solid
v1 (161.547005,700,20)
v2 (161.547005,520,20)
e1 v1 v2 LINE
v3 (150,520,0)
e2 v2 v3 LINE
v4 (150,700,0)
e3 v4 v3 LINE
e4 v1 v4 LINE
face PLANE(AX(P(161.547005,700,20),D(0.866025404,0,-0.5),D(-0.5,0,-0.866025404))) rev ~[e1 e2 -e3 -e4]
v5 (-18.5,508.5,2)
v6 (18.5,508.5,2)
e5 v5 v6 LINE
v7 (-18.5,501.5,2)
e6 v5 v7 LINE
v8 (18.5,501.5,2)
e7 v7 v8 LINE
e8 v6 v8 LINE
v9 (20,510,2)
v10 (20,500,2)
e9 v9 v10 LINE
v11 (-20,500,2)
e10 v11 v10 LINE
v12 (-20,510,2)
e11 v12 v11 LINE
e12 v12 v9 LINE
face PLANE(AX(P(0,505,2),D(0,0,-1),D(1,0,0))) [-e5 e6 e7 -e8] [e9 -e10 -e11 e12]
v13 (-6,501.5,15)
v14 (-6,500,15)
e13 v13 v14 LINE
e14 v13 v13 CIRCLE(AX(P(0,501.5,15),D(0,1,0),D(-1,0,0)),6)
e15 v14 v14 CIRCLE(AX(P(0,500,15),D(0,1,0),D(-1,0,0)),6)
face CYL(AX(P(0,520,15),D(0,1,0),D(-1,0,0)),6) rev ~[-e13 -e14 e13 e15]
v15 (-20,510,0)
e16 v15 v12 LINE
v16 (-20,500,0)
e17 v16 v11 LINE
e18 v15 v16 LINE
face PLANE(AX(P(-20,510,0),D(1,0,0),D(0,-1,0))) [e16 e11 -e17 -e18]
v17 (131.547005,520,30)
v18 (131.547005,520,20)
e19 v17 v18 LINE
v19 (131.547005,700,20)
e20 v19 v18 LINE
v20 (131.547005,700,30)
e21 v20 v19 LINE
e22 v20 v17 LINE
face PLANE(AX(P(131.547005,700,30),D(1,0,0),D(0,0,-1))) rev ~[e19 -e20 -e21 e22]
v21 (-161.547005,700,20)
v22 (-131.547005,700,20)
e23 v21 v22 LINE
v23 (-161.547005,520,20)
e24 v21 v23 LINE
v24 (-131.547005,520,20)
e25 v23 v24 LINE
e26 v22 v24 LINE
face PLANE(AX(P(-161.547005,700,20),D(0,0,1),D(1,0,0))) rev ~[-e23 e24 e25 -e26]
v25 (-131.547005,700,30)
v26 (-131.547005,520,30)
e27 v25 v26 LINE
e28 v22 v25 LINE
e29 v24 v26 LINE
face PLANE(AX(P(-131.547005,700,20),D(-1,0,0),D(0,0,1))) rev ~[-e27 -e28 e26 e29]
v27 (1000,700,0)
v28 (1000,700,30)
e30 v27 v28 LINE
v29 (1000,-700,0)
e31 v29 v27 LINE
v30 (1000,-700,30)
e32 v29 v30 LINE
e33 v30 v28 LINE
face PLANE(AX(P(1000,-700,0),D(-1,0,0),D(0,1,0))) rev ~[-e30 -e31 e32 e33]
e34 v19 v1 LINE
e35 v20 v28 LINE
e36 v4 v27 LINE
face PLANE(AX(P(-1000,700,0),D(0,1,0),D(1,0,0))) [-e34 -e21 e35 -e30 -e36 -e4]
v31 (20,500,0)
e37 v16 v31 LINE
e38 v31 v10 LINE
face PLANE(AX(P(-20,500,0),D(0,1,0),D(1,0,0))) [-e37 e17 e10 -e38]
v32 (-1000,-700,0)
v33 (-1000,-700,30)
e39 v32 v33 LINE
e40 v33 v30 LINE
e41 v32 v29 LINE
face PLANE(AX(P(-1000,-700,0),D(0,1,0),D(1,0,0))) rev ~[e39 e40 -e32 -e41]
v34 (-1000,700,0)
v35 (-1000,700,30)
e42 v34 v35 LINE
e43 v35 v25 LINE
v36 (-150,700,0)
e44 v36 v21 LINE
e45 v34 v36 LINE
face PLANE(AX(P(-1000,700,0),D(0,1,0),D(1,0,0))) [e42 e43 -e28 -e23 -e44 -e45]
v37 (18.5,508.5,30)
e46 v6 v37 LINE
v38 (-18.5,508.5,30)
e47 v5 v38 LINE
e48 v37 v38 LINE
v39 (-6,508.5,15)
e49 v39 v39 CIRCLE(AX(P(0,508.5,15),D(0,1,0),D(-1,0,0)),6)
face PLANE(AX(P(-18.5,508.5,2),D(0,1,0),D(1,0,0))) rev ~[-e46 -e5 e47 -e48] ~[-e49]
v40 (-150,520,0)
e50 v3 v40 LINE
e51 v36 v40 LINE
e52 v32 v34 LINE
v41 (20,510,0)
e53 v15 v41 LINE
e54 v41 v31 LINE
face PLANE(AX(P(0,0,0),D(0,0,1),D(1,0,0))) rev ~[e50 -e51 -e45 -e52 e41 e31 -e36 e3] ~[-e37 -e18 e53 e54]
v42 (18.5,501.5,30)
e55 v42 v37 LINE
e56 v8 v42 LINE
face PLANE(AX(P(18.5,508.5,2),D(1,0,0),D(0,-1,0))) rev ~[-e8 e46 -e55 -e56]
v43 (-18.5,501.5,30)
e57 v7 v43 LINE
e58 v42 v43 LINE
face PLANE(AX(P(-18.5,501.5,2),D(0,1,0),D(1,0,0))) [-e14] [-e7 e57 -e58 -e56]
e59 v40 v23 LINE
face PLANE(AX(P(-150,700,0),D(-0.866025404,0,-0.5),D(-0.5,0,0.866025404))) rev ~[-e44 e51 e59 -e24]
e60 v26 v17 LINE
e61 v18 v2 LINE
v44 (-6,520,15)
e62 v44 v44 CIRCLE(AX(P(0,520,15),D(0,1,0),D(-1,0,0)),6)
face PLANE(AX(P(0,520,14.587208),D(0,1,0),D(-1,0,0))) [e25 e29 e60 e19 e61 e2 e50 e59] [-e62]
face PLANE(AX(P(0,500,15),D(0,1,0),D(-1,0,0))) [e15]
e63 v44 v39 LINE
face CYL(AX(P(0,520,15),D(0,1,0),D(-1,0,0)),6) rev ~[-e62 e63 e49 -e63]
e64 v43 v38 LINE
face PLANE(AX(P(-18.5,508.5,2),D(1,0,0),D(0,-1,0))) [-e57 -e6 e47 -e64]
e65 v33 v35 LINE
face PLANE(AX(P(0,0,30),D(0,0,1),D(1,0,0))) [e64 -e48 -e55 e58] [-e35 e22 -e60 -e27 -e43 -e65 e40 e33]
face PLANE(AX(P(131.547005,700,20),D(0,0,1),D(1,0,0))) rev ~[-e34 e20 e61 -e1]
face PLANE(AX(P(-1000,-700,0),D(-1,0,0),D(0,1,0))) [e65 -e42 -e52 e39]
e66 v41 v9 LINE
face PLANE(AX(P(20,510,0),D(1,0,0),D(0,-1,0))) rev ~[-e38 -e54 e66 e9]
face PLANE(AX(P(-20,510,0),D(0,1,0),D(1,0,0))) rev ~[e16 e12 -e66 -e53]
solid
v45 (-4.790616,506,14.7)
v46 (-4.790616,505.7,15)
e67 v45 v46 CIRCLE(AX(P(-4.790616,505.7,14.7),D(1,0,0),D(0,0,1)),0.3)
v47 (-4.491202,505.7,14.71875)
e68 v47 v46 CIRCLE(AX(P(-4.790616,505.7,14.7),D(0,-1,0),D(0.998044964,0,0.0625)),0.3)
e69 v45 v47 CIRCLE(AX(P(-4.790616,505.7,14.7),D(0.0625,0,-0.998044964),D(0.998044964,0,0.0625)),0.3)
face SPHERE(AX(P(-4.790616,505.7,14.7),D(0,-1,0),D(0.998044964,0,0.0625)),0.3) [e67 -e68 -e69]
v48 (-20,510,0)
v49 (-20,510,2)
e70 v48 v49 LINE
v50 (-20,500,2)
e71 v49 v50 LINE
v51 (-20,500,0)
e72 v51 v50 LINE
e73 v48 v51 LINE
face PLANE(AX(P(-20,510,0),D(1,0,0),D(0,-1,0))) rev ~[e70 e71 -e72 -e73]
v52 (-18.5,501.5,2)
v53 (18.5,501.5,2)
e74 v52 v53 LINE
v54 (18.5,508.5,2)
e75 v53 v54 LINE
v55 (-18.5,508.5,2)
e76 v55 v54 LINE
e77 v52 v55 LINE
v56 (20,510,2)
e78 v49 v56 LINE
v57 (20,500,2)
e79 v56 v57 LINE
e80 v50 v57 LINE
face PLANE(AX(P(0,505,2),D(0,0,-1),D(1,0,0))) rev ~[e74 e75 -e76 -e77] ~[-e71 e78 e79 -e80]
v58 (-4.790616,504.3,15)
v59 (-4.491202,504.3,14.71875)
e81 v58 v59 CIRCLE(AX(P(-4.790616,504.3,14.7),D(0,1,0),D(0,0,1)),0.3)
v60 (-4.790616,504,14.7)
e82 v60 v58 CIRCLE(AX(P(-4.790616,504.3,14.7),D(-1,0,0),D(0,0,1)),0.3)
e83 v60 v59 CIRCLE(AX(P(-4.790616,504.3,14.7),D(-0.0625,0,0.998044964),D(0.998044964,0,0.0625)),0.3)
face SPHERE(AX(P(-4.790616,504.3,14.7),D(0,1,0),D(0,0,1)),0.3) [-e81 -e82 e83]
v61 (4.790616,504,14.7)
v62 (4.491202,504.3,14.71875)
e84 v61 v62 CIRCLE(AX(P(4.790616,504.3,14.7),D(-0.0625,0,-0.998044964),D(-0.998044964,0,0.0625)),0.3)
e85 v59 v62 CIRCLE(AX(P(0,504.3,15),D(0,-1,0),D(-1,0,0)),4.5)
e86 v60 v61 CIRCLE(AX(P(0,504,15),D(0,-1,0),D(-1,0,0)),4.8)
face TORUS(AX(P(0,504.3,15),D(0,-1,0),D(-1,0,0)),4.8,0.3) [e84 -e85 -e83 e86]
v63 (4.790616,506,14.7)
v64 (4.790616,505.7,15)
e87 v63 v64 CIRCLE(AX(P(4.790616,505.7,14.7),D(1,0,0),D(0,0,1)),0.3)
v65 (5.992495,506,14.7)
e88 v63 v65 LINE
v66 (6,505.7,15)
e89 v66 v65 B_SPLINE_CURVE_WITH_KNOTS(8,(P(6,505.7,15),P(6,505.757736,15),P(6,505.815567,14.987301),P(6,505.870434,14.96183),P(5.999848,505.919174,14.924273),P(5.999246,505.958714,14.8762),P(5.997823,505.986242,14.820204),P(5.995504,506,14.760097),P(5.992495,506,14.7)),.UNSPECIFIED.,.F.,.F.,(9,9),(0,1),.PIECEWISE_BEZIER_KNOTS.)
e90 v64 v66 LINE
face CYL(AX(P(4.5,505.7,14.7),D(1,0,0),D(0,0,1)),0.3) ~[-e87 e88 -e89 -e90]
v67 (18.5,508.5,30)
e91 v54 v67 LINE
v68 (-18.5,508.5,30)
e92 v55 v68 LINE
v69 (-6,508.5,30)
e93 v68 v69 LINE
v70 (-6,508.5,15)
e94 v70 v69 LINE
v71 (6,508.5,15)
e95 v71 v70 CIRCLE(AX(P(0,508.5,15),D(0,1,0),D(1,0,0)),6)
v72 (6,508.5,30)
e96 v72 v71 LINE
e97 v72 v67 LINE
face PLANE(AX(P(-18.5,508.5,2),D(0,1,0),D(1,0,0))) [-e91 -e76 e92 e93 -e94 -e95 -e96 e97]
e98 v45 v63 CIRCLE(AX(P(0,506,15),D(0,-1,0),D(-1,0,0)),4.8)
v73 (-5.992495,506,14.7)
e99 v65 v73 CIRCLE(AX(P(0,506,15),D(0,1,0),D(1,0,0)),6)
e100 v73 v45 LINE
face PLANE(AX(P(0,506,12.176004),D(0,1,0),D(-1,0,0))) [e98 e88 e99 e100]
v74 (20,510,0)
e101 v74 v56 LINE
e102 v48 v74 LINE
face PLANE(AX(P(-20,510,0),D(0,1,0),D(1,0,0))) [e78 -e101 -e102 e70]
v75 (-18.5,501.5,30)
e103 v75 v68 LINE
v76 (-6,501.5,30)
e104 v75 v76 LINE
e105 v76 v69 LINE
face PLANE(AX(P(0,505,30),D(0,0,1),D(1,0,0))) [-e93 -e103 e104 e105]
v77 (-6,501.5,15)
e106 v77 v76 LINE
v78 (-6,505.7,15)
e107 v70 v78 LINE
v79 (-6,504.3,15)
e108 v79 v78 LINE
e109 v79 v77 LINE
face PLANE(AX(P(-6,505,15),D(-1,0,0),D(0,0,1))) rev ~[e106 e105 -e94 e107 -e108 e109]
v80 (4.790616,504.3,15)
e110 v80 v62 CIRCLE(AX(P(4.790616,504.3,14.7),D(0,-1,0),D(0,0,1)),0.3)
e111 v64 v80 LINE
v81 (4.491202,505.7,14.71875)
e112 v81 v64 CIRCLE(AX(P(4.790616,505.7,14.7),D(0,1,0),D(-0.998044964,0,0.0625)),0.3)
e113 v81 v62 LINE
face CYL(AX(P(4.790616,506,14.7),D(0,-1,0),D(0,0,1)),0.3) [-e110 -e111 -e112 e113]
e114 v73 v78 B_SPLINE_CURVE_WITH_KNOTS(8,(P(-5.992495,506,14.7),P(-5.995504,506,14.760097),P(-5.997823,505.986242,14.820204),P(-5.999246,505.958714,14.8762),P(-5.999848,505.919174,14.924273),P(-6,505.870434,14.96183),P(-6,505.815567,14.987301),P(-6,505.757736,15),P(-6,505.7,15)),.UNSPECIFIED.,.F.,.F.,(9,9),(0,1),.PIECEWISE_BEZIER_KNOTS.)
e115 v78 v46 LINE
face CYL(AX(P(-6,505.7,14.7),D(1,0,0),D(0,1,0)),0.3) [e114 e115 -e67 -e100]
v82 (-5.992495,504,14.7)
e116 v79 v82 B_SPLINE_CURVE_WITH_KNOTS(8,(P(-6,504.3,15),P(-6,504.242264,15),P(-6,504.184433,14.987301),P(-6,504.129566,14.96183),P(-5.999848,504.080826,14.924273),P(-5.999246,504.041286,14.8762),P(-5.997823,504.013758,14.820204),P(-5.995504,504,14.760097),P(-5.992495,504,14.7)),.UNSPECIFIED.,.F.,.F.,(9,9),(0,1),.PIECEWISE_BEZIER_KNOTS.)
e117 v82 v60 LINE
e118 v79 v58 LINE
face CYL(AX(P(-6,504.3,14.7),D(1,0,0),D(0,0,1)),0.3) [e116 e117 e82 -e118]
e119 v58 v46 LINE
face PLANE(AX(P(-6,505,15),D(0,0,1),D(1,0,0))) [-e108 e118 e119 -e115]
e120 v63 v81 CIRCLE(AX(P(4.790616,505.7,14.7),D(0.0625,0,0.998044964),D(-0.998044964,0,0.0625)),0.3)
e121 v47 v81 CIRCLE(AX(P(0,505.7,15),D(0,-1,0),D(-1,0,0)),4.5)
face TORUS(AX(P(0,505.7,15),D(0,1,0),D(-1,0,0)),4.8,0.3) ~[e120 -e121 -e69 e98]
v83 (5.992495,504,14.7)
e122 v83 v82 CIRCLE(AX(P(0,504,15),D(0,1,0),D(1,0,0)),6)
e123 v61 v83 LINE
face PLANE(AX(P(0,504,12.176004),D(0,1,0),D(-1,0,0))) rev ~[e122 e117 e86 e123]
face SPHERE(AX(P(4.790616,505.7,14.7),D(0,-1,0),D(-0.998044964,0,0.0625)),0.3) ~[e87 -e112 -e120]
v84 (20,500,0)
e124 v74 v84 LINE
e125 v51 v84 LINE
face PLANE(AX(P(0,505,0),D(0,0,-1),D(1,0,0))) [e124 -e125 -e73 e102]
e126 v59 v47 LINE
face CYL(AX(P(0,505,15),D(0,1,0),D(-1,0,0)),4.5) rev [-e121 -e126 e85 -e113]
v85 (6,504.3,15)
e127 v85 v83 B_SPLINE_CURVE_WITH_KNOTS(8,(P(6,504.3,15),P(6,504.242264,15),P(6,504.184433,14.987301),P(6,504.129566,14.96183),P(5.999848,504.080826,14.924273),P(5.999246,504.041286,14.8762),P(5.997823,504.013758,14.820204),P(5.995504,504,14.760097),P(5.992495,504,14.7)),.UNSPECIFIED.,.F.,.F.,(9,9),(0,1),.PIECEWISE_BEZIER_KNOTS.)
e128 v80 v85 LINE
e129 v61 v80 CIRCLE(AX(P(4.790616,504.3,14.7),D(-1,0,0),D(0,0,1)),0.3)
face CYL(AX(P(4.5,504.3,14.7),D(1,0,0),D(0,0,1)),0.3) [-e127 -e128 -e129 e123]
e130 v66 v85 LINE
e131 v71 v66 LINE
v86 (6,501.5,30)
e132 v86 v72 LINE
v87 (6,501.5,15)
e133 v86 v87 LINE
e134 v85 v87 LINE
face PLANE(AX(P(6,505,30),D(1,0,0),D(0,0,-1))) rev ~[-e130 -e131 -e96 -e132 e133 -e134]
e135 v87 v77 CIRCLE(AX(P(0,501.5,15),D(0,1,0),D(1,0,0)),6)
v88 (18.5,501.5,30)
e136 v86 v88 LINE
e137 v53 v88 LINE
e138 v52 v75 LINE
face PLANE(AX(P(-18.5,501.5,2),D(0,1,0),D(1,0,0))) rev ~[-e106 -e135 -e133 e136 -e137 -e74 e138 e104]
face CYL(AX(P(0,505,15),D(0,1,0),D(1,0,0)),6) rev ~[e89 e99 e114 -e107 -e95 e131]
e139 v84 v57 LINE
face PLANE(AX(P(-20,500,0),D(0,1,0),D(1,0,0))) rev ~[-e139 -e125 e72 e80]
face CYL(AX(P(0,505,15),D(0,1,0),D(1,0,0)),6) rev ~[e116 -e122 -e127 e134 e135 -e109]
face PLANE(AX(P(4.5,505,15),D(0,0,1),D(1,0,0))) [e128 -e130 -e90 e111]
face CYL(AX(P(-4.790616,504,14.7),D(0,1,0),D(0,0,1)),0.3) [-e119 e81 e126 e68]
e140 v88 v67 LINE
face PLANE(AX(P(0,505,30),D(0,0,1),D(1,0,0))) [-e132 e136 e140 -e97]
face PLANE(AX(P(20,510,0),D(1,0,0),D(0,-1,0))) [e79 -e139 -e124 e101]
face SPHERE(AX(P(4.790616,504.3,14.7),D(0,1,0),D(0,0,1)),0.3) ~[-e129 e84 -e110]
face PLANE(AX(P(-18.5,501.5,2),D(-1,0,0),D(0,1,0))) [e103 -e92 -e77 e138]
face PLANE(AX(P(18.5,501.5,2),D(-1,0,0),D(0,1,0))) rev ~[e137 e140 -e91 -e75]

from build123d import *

# Parameters (mm, degrees)
F0_W      = 2000
F0_H      = 1400
F1_DEPTH  = 30
F3_DEPTH  = 180
F4_R      = 6
F5_DEPTH  = 20
F6_W      = 40
F6_H      = 10
F7_DEPTH  = 2
F9_W      = 37
F9_H      = 7
F10_DEPTH = 28.001
F12_DEPTH = 2
F13_W     = 37
F13_H     = 7
F14_DEPTH = 28
F15_DEPTH = 12.5
F16_DEPTH = 1
F17_R     = 0.3


with BuildPart() as f1:
    # F0 (on Top) → F1 (new body)
    with BuildSketch(Plane.XY):
        Rectangle(F0_W, F0_H)
    extrude(amount=F1_DEPTH)

    # F2 (on face) → F3 (cut)
    with BuildSketch(Plane(origin=(0, 700, 0), x_dir=(-1, 0, 0), z_dir=(0, 1, 0))):
        Polygon((-161.5470053838, 20), (-150, 0), (150, 0), (161.5470053838, 20), (131.5470053838, 20), (131.5470053838, 30), (-131.5470053838, 30), (-131.5470053838, 20), align=None)
    extrude(amount=-F3_DEPTH, mode=Mode.SUBTRACT)

    # F4 (on face) → F5 (cut)
    with BuildSketch(Plane(origin=(0, 520, 0), x_dir=(-1, 0, 0), z_dir=(0, 1, 0))):
        with Locations((0, 15)):
            Circle(F4_R)
    extrude(amount=-F5_DEPTH, mode=Mode.SUBTRACT)

    # F6 (on face) → F7 (cut)
    with BuildSketch(Plane(origin=(0, 0, 0), x_dir=(1, 0, 0), z_dir=(0, 0, -1))):
        with Locations((0, -505)):
            Rectangle(F6_W, F6_H)
    extrude(amount=-F7_DEPTH, mode=Mode.SUBTRACT)

    # F9 (on face) → F10 (cut, through all)
    with BuildSketch(Plane(origin=(0, 0, 2), x_dir=(1, 0, 0), z_dir=(0, 0, -1))):
        with Locations((0, -505)):
            Rectangle(F9_W, F9_H)
    extrude(amount=-F10_DEPTH, mode=Mode.SUBTRACT)


with BuildPart() as f12:
    # F6 (on face) → F12 (new body, through all)
    with BuildSketch(Plane(origin=(0, 0, 0), x_dir=(1, 0, 0), z_dir=(0, 0, -1))):
        with Locations((0, -505)):
            Rectangle(F6_W, F6_H)
    extrude(amount=-F12_DEPTH)

    # F13 (on face) → F14 (join, through all)
    with BuildSketch(Plane.XY.offset(2)):
        with Locations((0, 505)):
            Rectangle(F13_W, F13_H)
    extrude(amount=F14_DEPTH)

    # F11 (on offset) → F15 (cut, symmetric)
    with BuildSketch(Plane(origin=(0, 505, 0), x_dir=(-1, 0, 0), z_dir=(0, 1, 0))):
        with BuildLine():
            ThreePointArc((-6, 15), (0, 21), (6, 15))
            Line((6, 15), (6, 30))
            Line((6, 30), (-6, 30))
            Line((-6, 30), (-6, 15))
        make_face()
        with BuildLine():
            Line((4.5, 15), (6, 15))
            ThreePointArc((6, 15), (0, 21), (-6, 15))
            Line((-6, 15), (-4.5, 15))
            ThreePointArc((-4.5, 15), (0, 19.5), (4.5, 15))
        make_face()
        with BuildLine():
            Line((-4.5, 15), (4.5, 15))
            ThreePointArc((4.5, 15), (0, 19.5), (-4.5, 15))
        make_face()
        with BuildLine():
            ThreePointArc((-4.5, 15), (0, 10.5), (4.5, 15))
            Line((4.5, 15), (-4.5, 15))
        make_face()
        with BuildLine():
            ThreePointArc((-6, 15), (0, 9), (6, 15))
            Line((6, 15), (4.5, 15))
            ThreePointArc((4.5, 15), (0, 10.5), (-4.5, 15))
            Line((-4.5, 15), (-6, 15))
        make_face()
    extrude(amount=F15_DEPTH, both=True, mode=Mode.SUBTRACT)

    # F11 (on offset) → F16 (join, symmetric)
    with BuildSketch(Plane(origin=(0, 505, 0), x_dir=(-1, 0, 0), z_dir=(0, 1, 0))):
        with BuildLine():
            ThreePointArc((-6, 15), (0, 9), (6, 15))
            Line((6, 15), (4.5, 15))
            ThreePointArc((4.5, 15), (0, 10.5), (-4.5, 15))
            Line((-4.5, 15), (-6, 15))
        make_face()
    extrude(amount=F16_DEPTH, both=True)

    # F17
    f17_edges = [f12.edges().sort_by_distance(p)[0] for p in [
        (4.5, 505, 15),
        (5.25, 504, 15),
        (0, 506, 10.5),
        (0, 504, 10.5),
        (5.25, 506, 15),
        (-5.25, 506, 15),
        (-4.5, 505, 15),
        (-5.25, 504, 15),
    ]]
    fillet(f17_edges, radius=F17_R)


solid = Compound([f1.part, f12.part])
